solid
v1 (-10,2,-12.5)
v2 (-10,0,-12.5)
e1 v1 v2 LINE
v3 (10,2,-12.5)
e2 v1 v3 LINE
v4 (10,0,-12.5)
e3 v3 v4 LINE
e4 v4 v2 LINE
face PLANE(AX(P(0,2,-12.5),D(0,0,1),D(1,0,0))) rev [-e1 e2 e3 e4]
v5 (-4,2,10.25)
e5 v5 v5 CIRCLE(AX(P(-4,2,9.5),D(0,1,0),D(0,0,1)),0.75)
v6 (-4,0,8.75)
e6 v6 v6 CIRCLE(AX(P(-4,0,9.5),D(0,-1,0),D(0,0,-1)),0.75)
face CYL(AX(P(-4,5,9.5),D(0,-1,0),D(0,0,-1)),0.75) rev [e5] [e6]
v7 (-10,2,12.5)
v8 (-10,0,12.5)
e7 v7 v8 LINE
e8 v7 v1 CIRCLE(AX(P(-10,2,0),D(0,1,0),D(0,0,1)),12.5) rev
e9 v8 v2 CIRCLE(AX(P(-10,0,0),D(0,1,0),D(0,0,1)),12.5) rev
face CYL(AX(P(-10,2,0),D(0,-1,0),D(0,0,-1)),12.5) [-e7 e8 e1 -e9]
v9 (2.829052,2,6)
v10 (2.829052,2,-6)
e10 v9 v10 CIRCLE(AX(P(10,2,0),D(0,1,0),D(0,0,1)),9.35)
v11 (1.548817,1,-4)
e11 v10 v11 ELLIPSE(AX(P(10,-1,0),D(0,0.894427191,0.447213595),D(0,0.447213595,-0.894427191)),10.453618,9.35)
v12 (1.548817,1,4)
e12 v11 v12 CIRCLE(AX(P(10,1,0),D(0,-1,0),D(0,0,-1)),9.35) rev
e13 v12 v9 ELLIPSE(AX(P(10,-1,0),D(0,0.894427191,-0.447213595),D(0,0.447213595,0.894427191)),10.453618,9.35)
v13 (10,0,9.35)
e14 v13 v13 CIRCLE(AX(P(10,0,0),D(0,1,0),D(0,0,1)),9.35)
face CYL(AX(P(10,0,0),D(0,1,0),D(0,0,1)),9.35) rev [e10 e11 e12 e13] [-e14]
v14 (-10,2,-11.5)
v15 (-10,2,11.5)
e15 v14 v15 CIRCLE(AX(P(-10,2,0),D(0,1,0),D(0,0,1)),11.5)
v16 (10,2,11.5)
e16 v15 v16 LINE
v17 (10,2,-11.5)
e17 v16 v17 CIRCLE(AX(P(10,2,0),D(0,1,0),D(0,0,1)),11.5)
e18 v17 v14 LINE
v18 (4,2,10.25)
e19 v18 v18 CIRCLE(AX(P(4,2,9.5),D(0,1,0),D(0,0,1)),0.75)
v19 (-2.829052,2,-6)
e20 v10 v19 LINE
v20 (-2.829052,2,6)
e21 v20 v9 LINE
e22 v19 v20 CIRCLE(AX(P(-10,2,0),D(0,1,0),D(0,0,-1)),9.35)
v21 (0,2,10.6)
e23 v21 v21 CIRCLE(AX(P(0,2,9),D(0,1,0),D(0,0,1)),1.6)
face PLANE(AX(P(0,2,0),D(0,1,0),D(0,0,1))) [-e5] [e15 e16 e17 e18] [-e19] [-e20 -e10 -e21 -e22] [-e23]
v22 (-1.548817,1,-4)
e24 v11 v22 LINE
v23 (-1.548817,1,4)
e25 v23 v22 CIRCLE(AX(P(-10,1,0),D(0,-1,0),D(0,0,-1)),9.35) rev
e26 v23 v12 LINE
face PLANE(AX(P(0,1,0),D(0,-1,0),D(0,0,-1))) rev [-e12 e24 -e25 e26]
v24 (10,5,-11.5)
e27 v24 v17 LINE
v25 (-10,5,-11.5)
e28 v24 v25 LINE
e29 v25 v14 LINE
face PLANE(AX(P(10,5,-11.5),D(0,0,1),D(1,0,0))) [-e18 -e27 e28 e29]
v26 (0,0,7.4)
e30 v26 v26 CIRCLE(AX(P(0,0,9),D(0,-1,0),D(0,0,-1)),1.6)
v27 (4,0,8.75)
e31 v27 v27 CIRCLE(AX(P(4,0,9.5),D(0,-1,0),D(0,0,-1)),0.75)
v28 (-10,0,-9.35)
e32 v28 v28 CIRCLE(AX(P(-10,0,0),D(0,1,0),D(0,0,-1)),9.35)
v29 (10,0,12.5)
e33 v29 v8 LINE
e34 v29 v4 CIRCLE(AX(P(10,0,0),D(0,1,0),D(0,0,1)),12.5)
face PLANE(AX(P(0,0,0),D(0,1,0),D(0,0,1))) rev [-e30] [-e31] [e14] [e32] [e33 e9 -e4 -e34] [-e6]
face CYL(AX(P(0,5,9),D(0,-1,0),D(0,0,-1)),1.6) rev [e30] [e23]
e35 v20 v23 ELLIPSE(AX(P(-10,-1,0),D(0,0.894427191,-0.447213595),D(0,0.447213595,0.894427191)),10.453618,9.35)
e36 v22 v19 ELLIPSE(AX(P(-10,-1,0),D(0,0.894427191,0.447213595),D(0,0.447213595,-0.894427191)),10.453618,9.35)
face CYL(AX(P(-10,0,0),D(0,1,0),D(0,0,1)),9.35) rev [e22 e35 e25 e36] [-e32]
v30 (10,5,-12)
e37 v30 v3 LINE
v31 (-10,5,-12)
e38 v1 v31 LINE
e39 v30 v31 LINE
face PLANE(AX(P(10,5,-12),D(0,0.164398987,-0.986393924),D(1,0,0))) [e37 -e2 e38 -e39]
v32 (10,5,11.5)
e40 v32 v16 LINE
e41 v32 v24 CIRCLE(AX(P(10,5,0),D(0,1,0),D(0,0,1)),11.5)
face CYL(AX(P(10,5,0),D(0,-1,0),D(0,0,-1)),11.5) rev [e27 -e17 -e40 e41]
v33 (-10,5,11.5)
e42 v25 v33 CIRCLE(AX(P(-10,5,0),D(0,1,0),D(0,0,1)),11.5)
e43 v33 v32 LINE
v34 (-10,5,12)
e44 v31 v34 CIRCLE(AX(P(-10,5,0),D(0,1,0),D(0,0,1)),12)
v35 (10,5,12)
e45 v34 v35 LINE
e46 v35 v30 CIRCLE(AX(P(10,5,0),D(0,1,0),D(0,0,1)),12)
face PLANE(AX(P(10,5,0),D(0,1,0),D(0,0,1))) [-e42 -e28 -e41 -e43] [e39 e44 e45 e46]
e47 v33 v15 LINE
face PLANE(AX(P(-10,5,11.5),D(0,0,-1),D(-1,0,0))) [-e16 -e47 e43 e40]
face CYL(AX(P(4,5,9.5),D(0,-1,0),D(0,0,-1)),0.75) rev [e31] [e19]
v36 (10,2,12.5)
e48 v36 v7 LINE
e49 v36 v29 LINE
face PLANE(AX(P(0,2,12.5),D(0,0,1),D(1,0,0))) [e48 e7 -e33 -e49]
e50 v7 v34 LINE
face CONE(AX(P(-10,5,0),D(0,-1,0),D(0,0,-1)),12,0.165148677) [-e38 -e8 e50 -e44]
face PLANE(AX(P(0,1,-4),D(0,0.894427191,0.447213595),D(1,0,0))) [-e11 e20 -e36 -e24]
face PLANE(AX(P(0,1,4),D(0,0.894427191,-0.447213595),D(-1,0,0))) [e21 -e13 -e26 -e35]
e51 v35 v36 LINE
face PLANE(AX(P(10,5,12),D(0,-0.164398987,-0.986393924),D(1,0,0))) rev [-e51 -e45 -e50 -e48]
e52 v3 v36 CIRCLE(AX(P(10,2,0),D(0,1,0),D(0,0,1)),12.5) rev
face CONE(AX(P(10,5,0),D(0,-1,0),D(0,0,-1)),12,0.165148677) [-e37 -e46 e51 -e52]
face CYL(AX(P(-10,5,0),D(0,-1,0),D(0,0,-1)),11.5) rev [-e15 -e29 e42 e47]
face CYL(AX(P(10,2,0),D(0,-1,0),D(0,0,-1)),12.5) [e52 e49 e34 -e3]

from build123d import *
from OCP.BRepFilletAPI import BRepFilletAPI_MakeChamfer

# Parameters (mm, degrees)
BOSS_EXTRUDE1_DEPTH = 2
SKETCH2_R           = 9.349999999999996
CUT_EXTRUDE1_DEPTH  = 26.81666128685116
BOSS_EXTRUDE2_DEPTH = 3
CHAMFER1_SIZE       = 3
CHAMFER1_SIZE2      = 0.5
SKETCH4_W           = 15.000000000000002
SKETCH4_H           = 12
CUT_EXTRUDE2_DEPTH  = 1
CHAMFER2_SIZE       = 1
CHAMFER2_SIZE_2     = 2
SKETCH5_R           = 1.6000000000000005
SKETCH5_R_2         = 0.75
SKETCH5_R_3         = 0.7500000000000004
CUT_EXTRUDE3_DEPTH  = 27.22022120425378


with BuildPart() as part:
    # Sketch1 → Boss-Extrude1 (new body)
    with BuildSketch(Plane(origin=(0, 0, 0), x_dir=(1, 0, 0), z_dir=(0, 1, 0))):
        with BuildLine():
            Line((-22.5, 0), (-10, 0))
            Line((-10, 0), (1.421e-14, 0))
            Line((1.351e-14, 0), (-3.6e-16, 12.499999999999996))
            Line((0, 12.499999999999996), (-9.999999999999998, 12.499999999999996))
            ThreePointArc((-10.000000000000007, 12.499999999999996), (-18.83883476483184, 8.83883476483184), (-22.499999999999993, 7.9e-16))
        make_face()
        with BuildLine():
            Line((1.421e-14, 0), (-10, 0))
            Line((-10, 0), (-22.5, 0))
            ThreePointArc((-22.499999999999993, 7.9e-16), (-18.83883476483183, -8.83883476483185), (-9.999999999999972, -12.499999999999993))
            Line((-9.999999999999973, -12.499999999999996), (2.665e-14, -12.499999999999996))
            Line((2.739e-14, -12.499999999999996), (1.351e-14, 0))
        make_face()
        with BuildLine():
            Line((10, 0), (1.421e-14, 0))
            Line((1.351e-14, 0), (2.739e-14, -12.499999999999996))
            Line((2.665e-14, -12.499999999999996), (10.000000000000012, -12.499999999999996))
            ThreePointArc((10.000000000000012, -12.499999999999995), (18.838834764831844, -8.838834764831835), (22.499999999999993, 1.01e-15))
            Line((22.5, 0), (10, 0))
        make_face()
        with BuildLine():
            Line((-3.6e-16, 12.499999999999996), (1.351e-14, 0))
            Line((1.421e-14, 0), (10, 0))
            Line((10, 0), (22.5, 0))
            ThreePointArc((22.499999999999993, 1.01e-15), (18.83883476483184, 8.83883476483184), (10, 12.499999999999995))
            Line((9.999999999999998, 12.499999999999996), (0, 12.499999999999996))
        make_face()
    extrude(amount=BOSS_EXTRUDE1_DEPTH)

    # Sketch2 → Cut-Extrude1 (cut, through all)
    with BuildSketch(Plane(origin=(0, 2, 0), x_dir=(1, 0, 0), z_dir=(0, 1, 0))):
        with Locations(Location((10, 0, 0), (0, 0, 270))):
            Circle(SKETCH2_R)
        with Locations(Location((-10, 0, 0), (0, 0, 90))):
            Circle(SKETCH2_R)
    extrude(amount=-CUT_EXTRUDE1_DEPTH, mode=Mode.SUBTRACT)

    # Sketch3 → Boss-Extrude2 (add)
    with BuildSketch(Plane(origin=(0, 2, 0), x_dir=(1, 0, 0), z_dir=(0, 1, 0))):
        with BuildLine():
            Line((-9.99999999999998, -12.499999999999996), (10.000000000000009, -12.499999999999996))
            ThreePointArc((10.000000000000009, -12.499999999999996), (22.499999999999996, 2.78e-15), (10, 12.499999999999996))
            Line((10, 12.499999999999996), (-9.999999999999998, 12.499999999999996))
            ThreePointArc((-9.999999999999998, 12.499999999999996), (-22.499999999999996, -9.57e-15), (-9.99999999999998, -12.499999999999996))
        make_face()
        with BuildLine():
            Line((9.999999999999998, 11.499999999999996), (-9.999999999999998, 11.499999999999996))
            ThreePointArc((-9.999999999999998, 11.499999999999996), (-21.499999999999996, -8.81e-15), (-9.99999999999998, -11.499999999999996))
            Line((-9.99999999999998, -11.499999999999996), (10.000000000000012, -11.499999999999996))
            ThreePointArc((10.000000000000012, -11.499999999999996), (21.499999999999996, 7.66e-15), (9.999999999999998, 11.499999999999996))
        make_face(mode=Mode.SUBTRACT)
    extrude(amount=BOSS_EXTRUDE2_DEPTH)

    # Chamfer1: one chamfer whose edges measure the first distance from different faces: ONE call of the kernel's chamfer builder (chamfer() names one face for all edges)
    chamfer1_edges_1 = [part.edges().sort_by_distance(p)[0] for p in [
        (22.5, 5, -1.79e-15),
    ]]
    chamfer1_side_1 = [part.faces().sort_by_distance(p)[0] for p in [
        (22.499999999999993, 2.5, -1.478e-14),
    ]]
    chamfer1_edges_2 = [part.edges().sort_by_distance(p)[0] for p in [
        (0, 5, -12.499999999999996),
    ]]
    chamfer1_side_2 = [part.faces().sort_by_distance(p)[0] for p in [
        (-4.6e-16, 2.5, -12.499999999999996),
    ]]
    chamfer1_edges_3 = [part.edges().sort_by_distance(p)[0] for p in [
        (-22.499999999999993, 5, 1.178e-14),
    ]]
    chamfer1_side_3 = [part.faces().sort_by_distance(p)[0] for p in [
        (-22.499999999999993, 2.5, 1.611e-14),
    ]]
    chamfer1_edges_4 = [part.edges().sort_by_distance(p)[0] for p in [
        (1.421e-14, 5, 12.499999999999996),
    ]]
    chamfer1_side_4 = [part.faces().sort_by_distance(p)[0] for p in [
        (1.744e-14, 2.5, 12.499999999999996),
    ]]
    chamfer1 = BRepFilletAPI_MakeChamfer(part.part.solid().wrapped)
    for e in chamfer1_edges_1:
        chamfer1.Add(CHAMFER1_SIZE, CHAMFER1_SIZE2, e.wrapped, chamfer1_side_1[0].wrapped)  # the first distance lies on this face
    for e in chamfer1_edges_2:
        chamfer1.Add(CHAMFER1_SIZE, CHAMFER1_SIZE2, e.wrapped, chamfer1_side_2[0].wrapped)  # the first distance lies on this face
    for e in chamfer1_edges_3:
        chamfer1.Add(CHAMFER1_SIZE, CHAMFER1_SIZE2, e.wrapped, chamfer1_side_3[0].wrapped)  # the first distance lies on this face
    for e in chamfer1_edges_4:
        chamfer1.Add(CHAMFER1_SIZE, CHAMFER1_SIZE2, e.wrapped, chamfer1_side_4[0].wrapped)  # the first distance lies on this face
    add(Compound.cast(chamfer1.Shape()), mode=Mode.REPLACE)

    # Sketch4 → Cut-Extrude2 (cut)
    with BuildSketch(Plane(origin=(0, 2, 0), x_dir=(1, 0, 0), z_dir=(0, 1, 0))):
        Rectangle(SKETCH4_W, SKETCH4_H)
    extrude(amount=-CUT_EXTRUDE2_DEPTH, mode=Mode.SUBTRACT)

    # Chamfer2
    chamfer2_edges_1 = [part.edges().sort_by_distance(p)[0] for p in [
        (-8.9e-16, 1, 6),
    ]]
    chamfer2_side_1 = [part.faces().sort_by_distance(p)[0] for p in [
        (-8.9e-16, 1.02, 6),
    ]]
    chamfer2_edges_2 = [part.edges().sort_by_distance(p)[0] for p in [
        (8.9e-16, 1, -6),
    ]]
    chamfer2_side_2 = [part.faces().sort_by_distance(p)[0] for p in [
        (8.9e-16, 1, -5.98),
    ]]
    chamfer2 = BRepFilletAPI_MakeChamfer(part.part.solid().wrapped)
    for e in chamfer2_edges_1:
        chamfer2.Add(CHAMFER2_SIZE - 0.0001, CHAMFER2_SIZE_2 - 0.0001, e.wrapped, chamfer2_side_1[0].wrapped)
    for e in chamfer2_edges_2:
        chamfer2.Add(CHAMFER2_SIZE_2 - 0.0001, CHAMFER2_SIZE - 0.0001, e.wrapped, chamfer2_side_2[0].wrapped)
    add(Compound.cast(chamfer2.Shape()), mode=Mode.REPLACE)  # a hair under: the kernel refuses the full size

    # Sketch5 → Cut-Extrude3 (cut, through all)
    with BuildSketch(Plane.XZ):
        with Locations(Location((0, 8.999999999999998, 0), (0, 0, 270))):
            Circle(SKETCH5_R)
        with Locations(Location((-4.000000000000002, 9.499999999999998, 0), (0, 0, 270))):
            Circle(SKETCH5_R_2)
        with Locations(Location((3.9999999999999982, 9.499999999999998, 0), (0, 0, 270))):
            Circle(SKETCH5_R_3)
    extrude(amount=-CUT_EXTRUDE3_DEPTH, mode=Mode.SUBTRACT)


solid = part.part
